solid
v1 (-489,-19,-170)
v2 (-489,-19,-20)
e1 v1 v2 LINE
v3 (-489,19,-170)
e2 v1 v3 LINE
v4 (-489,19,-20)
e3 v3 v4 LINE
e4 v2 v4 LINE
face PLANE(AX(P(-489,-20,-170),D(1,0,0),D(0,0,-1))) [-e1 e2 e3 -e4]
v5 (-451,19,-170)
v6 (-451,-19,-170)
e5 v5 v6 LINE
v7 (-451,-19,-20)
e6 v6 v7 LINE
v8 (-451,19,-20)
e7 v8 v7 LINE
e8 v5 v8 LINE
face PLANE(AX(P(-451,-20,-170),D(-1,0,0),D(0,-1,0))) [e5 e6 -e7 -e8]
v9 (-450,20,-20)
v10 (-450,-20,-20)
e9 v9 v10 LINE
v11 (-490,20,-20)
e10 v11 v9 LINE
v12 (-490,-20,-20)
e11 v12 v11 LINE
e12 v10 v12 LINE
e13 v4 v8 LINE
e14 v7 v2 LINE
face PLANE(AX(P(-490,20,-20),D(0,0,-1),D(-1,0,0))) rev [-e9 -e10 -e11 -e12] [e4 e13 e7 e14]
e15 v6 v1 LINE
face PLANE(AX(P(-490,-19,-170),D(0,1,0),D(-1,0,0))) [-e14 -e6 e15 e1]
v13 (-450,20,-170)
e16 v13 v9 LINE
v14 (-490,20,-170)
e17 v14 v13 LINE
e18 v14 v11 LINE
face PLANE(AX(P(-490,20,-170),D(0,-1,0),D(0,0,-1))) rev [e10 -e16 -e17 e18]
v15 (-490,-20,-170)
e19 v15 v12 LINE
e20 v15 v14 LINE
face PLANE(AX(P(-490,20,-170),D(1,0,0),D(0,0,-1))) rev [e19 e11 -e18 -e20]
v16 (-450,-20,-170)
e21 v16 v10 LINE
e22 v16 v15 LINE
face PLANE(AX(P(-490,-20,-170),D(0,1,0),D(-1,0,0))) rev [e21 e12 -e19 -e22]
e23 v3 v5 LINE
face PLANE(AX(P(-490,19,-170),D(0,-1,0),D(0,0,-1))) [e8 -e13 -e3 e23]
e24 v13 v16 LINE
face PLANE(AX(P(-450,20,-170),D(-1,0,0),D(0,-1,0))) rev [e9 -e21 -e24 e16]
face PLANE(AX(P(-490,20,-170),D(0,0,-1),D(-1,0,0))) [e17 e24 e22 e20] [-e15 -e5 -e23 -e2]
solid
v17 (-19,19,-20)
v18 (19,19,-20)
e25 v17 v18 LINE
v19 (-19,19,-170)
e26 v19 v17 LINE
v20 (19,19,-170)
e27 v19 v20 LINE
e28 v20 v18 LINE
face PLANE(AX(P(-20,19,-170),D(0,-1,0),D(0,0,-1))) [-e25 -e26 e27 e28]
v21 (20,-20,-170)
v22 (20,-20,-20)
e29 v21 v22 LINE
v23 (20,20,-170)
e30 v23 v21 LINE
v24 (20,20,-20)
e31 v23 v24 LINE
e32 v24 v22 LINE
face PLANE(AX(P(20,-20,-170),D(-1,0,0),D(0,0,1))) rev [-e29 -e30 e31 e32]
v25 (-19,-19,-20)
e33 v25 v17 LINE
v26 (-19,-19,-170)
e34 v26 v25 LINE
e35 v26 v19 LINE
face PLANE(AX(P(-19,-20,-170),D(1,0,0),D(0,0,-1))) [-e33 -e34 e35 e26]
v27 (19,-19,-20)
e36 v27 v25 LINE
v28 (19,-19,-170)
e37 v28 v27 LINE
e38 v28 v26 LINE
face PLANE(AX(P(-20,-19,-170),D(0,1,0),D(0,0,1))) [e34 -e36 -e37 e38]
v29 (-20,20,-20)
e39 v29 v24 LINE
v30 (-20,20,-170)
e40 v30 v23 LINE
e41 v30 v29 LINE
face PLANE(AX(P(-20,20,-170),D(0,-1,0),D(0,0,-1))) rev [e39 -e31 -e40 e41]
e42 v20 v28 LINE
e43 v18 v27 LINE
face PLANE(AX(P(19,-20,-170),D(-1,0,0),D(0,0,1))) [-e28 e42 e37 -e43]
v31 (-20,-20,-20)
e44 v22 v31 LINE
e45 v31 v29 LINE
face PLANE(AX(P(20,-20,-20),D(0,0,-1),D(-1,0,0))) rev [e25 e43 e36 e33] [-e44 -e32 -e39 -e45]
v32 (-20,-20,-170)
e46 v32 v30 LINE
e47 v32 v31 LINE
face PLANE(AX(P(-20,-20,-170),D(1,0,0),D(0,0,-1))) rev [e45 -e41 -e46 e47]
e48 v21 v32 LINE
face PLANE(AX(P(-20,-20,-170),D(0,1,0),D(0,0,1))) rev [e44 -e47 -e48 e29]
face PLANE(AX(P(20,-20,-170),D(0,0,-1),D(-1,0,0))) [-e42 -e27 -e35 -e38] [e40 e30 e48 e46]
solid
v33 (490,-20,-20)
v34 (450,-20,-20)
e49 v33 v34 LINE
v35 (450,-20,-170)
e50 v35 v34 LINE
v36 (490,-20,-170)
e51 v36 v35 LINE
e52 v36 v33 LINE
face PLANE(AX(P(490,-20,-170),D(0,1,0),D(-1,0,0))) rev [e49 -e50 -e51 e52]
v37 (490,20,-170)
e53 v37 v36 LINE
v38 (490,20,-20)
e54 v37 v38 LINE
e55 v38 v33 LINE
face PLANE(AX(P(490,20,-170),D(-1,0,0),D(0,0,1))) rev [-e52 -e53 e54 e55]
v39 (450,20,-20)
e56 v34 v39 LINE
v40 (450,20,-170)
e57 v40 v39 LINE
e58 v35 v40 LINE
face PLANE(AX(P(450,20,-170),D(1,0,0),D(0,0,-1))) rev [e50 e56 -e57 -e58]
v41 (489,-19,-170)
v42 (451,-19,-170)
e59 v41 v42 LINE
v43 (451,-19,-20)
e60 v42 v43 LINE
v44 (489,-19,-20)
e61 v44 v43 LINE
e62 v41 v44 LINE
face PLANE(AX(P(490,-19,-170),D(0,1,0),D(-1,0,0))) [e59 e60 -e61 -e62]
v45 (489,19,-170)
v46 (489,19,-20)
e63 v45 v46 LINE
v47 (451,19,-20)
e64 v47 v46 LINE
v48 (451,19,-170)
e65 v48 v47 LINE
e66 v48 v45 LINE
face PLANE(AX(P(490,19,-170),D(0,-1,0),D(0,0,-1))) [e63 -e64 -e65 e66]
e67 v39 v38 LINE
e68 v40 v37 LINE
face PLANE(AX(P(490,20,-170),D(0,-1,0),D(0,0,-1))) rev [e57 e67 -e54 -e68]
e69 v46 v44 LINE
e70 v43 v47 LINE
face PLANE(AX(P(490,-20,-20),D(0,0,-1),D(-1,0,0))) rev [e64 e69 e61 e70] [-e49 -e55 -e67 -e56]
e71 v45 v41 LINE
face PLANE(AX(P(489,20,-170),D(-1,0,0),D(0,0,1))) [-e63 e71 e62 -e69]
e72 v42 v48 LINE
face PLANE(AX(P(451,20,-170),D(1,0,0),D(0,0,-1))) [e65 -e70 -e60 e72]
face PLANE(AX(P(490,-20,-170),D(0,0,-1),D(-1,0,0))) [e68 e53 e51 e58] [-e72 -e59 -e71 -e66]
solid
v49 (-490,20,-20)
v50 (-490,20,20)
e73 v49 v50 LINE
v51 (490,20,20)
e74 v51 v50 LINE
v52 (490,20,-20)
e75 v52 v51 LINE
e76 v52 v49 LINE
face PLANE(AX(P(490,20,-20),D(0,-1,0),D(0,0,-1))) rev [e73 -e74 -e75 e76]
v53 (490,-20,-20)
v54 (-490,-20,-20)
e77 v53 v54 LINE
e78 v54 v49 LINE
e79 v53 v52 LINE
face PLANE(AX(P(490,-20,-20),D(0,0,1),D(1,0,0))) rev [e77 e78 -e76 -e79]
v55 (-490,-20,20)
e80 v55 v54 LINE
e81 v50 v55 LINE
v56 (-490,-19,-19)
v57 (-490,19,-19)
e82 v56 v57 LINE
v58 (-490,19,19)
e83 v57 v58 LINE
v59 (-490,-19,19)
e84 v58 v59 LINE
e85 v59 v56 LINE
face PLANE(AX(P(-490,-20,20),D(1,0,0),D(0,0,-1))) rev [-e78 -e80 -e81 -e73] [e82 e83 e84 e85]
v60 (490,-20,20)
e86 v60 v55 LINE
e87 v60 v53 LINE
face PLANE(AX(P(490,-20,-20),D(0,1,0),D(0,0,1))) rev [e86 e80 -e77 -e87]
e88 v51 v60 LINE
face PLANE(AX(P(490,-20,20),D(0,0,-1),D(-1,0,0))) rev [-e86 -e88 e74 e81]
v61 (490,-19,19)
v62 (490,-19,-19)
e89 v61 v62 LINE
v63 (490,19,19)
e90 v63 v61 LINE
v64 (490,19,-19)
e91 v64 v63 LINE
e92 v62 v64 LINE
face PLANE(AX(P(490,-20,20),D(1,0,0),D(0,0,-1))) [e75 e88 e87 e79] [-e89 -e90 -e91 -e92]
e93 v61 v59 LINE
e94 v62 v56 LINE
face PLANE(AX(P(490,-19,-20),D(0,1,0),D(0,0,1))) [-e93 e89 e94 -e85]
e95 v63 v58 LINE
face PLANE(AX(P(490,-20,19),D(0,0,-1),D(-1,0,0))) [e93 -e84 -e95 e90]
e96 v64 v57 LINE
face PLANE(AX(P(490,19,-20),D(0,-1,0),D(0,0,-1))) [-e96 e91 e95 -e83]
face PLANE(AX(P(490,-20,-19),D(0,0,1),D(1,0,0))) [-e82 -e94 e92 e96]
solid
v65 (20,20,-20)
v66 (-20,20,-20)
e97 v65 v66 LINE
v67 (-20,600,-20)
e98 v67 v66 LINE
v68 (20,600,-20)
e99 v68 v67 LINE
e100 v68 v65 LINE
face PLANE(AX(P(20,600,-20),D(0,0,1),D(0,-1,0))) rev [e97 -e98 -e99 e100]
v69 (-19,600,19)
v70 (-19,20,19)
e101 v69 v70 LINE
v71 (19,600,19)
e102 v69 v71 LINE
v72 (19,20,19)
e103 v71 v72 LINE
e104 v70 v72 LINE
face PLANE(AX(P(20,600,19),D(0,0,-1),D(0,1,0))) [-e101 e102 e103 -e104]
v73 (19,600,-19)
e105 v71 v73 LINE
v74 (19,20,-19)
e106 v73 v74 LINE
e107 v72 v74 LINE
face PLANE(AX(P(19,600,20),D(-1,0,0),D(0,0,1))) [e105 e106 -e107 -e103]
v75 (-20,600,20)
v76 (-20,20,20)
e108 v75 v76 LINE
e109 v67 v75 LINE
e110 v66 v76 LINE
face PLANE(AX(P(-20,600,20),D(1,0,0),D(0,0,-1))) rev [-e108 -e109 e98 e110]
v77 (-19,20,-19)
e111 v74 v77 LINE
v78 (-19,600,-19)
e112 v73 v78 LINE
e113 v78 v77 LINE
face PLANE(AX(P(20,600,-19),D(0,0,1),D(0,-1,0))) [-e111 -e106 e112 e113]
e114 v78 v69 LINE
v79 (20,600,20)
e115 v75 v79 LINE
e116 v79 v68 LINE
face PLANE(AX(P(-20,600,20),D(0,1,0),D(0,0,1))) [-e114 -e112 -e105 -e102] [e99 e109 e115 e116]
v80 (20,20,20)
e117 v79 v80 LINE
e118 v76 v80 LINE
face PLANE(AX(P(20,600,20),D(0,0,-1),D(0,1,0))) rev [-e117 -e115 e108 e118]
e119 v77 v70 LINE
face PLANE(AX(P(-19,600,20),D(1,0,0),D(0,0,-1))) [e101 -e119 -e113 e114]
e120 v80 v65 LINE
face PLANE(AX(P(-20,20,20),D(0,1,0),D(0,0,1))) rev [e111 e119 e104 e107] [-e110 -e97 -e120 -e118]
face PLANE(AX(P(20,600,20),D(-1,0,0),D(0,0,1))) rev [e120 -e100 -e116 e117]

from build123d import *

# Parameters (mm, degrees)
CROQUIS1_W              = 40
CROQUIS1_H              = 40
CROQUIS1_W_2            = 38
CROQUIS1_H_2            = 38
EXTRUIR_L_MINA1_DEPTH   = 490
CROQUIS2_W              = 40
CROQUIS2_H              = 40
CROQUIS2_W_2            = 38
CROQUIS2_H_2            = 38
EXTRUIR_L_MINA3_DEPTH   = 150
CROQUIS3_W              = 40
CROQUIS3_H              = 40
CROQUIS3_W_2            = 38
CROQUIS3_H_2            = 38
EXTRUIR_L_MINA5_DEPTH   = 150
EXTRUIR_L_MINA5_2_DEPTH = 150
CROQUIS4_W              = 40
CROQUIS4_H              = 40
CROQUIS4_W_2            = 38
CROQUIS4_H_2            = 38
EXTRUIR_L_MINA6_DEPTH   = 580


with BuildPart() as part:
    # Croquis1 → Extruir-Lámina1 (new, symmetric)
    with BuildSketch(Plane(origin=(0, 0, 0), x_dir=(0, 0, -1), z_dir=(1, 0, 0))):
        Rectangle(CROQUIS1_W, CROQUIS1_H)
        Rectangle(CROQUIS1_W_2, CROQUIS1_H_2, mode=Mode.SUBTRACT)
    extrude(amount=EXTRUIR_L_MINA1_DEPTH, both=True)


with BuildPart() as body_2:
    # Croquis2 → Extruir-Lámina3 (new body)
    with BuildSketch(Plane(origin=(0, 0, -20), x_dir=(-1, 0, 0), z_dir=(0, 0, -1))):
        Rectangle(CROQUIS2_W, CROQUIS2_H)
        Rectangle(CROQUIS2_W_2, CROQUIS2_H_2, mode=Mode.SUBTRACT)
    extrude(amount=EXTRUIR_L_MINA3_DEPTH)


with BuildPart() as body_3:
    # Croquis3 → Extruir-Lámina5 (new body)
    with BuildSketch(Plane(origin=(0, 0, -20), x_dir=(-1, 0, 0), z_dir=(0, 0, -1))):
        with Locations((-470, 0)):
            Rectangle(CROQUIS3_W, CROQUIS3_H)
        with Locations((-470, 0)):
            Rectangle(CROQUIS3_W_2, CROQUIS3_H_2, mode=Mode.SUBTRACT)
    extrude(amount=EXTRUIR_L_MINA5_DEPTH)


with BuildPart() as body_4:
    # Croquis3 → Extruir-L_mina5 2 (new body)
    with BuildSketch(Plane(origin=(0, 0, -20), x_dir=(-1, 0, 0), z_dir=(0, 0, -1))):
        with Locations((470, 0)):
            Rectangle(CROQUIS3_W, CROQUIS3_H)
        with Locations((470, 0)):
            Rectangle(CROQUIS3_W_2, CROQUIS3_H_2, mode=Mode.SUBTRACT)
    extrude(amount=EXTRUIR_L_MINA5_2_DEPTH)


with BuildPart() as body_5:
    # Croquis4 → Extruir-Lámina6 (new body)
    with BuildSketch(Plane(origin=(0, 20, 0), x_dir=(1, 0, 0), z_dir=(0, 1, 0))):
        Rectangle(CROQUIS4_W, CROQUIS4_H)
        Rectangle(CROQUIS4_W_2, CROQUIS4_H_2, mode=Mode.SUBTRACT)
    extrude(amount=EXTRUIR_L_MINA6_DEPTH)


solid = Compound([part.part, body_2.part, body_3.part, body_4.part, body_5.part])
